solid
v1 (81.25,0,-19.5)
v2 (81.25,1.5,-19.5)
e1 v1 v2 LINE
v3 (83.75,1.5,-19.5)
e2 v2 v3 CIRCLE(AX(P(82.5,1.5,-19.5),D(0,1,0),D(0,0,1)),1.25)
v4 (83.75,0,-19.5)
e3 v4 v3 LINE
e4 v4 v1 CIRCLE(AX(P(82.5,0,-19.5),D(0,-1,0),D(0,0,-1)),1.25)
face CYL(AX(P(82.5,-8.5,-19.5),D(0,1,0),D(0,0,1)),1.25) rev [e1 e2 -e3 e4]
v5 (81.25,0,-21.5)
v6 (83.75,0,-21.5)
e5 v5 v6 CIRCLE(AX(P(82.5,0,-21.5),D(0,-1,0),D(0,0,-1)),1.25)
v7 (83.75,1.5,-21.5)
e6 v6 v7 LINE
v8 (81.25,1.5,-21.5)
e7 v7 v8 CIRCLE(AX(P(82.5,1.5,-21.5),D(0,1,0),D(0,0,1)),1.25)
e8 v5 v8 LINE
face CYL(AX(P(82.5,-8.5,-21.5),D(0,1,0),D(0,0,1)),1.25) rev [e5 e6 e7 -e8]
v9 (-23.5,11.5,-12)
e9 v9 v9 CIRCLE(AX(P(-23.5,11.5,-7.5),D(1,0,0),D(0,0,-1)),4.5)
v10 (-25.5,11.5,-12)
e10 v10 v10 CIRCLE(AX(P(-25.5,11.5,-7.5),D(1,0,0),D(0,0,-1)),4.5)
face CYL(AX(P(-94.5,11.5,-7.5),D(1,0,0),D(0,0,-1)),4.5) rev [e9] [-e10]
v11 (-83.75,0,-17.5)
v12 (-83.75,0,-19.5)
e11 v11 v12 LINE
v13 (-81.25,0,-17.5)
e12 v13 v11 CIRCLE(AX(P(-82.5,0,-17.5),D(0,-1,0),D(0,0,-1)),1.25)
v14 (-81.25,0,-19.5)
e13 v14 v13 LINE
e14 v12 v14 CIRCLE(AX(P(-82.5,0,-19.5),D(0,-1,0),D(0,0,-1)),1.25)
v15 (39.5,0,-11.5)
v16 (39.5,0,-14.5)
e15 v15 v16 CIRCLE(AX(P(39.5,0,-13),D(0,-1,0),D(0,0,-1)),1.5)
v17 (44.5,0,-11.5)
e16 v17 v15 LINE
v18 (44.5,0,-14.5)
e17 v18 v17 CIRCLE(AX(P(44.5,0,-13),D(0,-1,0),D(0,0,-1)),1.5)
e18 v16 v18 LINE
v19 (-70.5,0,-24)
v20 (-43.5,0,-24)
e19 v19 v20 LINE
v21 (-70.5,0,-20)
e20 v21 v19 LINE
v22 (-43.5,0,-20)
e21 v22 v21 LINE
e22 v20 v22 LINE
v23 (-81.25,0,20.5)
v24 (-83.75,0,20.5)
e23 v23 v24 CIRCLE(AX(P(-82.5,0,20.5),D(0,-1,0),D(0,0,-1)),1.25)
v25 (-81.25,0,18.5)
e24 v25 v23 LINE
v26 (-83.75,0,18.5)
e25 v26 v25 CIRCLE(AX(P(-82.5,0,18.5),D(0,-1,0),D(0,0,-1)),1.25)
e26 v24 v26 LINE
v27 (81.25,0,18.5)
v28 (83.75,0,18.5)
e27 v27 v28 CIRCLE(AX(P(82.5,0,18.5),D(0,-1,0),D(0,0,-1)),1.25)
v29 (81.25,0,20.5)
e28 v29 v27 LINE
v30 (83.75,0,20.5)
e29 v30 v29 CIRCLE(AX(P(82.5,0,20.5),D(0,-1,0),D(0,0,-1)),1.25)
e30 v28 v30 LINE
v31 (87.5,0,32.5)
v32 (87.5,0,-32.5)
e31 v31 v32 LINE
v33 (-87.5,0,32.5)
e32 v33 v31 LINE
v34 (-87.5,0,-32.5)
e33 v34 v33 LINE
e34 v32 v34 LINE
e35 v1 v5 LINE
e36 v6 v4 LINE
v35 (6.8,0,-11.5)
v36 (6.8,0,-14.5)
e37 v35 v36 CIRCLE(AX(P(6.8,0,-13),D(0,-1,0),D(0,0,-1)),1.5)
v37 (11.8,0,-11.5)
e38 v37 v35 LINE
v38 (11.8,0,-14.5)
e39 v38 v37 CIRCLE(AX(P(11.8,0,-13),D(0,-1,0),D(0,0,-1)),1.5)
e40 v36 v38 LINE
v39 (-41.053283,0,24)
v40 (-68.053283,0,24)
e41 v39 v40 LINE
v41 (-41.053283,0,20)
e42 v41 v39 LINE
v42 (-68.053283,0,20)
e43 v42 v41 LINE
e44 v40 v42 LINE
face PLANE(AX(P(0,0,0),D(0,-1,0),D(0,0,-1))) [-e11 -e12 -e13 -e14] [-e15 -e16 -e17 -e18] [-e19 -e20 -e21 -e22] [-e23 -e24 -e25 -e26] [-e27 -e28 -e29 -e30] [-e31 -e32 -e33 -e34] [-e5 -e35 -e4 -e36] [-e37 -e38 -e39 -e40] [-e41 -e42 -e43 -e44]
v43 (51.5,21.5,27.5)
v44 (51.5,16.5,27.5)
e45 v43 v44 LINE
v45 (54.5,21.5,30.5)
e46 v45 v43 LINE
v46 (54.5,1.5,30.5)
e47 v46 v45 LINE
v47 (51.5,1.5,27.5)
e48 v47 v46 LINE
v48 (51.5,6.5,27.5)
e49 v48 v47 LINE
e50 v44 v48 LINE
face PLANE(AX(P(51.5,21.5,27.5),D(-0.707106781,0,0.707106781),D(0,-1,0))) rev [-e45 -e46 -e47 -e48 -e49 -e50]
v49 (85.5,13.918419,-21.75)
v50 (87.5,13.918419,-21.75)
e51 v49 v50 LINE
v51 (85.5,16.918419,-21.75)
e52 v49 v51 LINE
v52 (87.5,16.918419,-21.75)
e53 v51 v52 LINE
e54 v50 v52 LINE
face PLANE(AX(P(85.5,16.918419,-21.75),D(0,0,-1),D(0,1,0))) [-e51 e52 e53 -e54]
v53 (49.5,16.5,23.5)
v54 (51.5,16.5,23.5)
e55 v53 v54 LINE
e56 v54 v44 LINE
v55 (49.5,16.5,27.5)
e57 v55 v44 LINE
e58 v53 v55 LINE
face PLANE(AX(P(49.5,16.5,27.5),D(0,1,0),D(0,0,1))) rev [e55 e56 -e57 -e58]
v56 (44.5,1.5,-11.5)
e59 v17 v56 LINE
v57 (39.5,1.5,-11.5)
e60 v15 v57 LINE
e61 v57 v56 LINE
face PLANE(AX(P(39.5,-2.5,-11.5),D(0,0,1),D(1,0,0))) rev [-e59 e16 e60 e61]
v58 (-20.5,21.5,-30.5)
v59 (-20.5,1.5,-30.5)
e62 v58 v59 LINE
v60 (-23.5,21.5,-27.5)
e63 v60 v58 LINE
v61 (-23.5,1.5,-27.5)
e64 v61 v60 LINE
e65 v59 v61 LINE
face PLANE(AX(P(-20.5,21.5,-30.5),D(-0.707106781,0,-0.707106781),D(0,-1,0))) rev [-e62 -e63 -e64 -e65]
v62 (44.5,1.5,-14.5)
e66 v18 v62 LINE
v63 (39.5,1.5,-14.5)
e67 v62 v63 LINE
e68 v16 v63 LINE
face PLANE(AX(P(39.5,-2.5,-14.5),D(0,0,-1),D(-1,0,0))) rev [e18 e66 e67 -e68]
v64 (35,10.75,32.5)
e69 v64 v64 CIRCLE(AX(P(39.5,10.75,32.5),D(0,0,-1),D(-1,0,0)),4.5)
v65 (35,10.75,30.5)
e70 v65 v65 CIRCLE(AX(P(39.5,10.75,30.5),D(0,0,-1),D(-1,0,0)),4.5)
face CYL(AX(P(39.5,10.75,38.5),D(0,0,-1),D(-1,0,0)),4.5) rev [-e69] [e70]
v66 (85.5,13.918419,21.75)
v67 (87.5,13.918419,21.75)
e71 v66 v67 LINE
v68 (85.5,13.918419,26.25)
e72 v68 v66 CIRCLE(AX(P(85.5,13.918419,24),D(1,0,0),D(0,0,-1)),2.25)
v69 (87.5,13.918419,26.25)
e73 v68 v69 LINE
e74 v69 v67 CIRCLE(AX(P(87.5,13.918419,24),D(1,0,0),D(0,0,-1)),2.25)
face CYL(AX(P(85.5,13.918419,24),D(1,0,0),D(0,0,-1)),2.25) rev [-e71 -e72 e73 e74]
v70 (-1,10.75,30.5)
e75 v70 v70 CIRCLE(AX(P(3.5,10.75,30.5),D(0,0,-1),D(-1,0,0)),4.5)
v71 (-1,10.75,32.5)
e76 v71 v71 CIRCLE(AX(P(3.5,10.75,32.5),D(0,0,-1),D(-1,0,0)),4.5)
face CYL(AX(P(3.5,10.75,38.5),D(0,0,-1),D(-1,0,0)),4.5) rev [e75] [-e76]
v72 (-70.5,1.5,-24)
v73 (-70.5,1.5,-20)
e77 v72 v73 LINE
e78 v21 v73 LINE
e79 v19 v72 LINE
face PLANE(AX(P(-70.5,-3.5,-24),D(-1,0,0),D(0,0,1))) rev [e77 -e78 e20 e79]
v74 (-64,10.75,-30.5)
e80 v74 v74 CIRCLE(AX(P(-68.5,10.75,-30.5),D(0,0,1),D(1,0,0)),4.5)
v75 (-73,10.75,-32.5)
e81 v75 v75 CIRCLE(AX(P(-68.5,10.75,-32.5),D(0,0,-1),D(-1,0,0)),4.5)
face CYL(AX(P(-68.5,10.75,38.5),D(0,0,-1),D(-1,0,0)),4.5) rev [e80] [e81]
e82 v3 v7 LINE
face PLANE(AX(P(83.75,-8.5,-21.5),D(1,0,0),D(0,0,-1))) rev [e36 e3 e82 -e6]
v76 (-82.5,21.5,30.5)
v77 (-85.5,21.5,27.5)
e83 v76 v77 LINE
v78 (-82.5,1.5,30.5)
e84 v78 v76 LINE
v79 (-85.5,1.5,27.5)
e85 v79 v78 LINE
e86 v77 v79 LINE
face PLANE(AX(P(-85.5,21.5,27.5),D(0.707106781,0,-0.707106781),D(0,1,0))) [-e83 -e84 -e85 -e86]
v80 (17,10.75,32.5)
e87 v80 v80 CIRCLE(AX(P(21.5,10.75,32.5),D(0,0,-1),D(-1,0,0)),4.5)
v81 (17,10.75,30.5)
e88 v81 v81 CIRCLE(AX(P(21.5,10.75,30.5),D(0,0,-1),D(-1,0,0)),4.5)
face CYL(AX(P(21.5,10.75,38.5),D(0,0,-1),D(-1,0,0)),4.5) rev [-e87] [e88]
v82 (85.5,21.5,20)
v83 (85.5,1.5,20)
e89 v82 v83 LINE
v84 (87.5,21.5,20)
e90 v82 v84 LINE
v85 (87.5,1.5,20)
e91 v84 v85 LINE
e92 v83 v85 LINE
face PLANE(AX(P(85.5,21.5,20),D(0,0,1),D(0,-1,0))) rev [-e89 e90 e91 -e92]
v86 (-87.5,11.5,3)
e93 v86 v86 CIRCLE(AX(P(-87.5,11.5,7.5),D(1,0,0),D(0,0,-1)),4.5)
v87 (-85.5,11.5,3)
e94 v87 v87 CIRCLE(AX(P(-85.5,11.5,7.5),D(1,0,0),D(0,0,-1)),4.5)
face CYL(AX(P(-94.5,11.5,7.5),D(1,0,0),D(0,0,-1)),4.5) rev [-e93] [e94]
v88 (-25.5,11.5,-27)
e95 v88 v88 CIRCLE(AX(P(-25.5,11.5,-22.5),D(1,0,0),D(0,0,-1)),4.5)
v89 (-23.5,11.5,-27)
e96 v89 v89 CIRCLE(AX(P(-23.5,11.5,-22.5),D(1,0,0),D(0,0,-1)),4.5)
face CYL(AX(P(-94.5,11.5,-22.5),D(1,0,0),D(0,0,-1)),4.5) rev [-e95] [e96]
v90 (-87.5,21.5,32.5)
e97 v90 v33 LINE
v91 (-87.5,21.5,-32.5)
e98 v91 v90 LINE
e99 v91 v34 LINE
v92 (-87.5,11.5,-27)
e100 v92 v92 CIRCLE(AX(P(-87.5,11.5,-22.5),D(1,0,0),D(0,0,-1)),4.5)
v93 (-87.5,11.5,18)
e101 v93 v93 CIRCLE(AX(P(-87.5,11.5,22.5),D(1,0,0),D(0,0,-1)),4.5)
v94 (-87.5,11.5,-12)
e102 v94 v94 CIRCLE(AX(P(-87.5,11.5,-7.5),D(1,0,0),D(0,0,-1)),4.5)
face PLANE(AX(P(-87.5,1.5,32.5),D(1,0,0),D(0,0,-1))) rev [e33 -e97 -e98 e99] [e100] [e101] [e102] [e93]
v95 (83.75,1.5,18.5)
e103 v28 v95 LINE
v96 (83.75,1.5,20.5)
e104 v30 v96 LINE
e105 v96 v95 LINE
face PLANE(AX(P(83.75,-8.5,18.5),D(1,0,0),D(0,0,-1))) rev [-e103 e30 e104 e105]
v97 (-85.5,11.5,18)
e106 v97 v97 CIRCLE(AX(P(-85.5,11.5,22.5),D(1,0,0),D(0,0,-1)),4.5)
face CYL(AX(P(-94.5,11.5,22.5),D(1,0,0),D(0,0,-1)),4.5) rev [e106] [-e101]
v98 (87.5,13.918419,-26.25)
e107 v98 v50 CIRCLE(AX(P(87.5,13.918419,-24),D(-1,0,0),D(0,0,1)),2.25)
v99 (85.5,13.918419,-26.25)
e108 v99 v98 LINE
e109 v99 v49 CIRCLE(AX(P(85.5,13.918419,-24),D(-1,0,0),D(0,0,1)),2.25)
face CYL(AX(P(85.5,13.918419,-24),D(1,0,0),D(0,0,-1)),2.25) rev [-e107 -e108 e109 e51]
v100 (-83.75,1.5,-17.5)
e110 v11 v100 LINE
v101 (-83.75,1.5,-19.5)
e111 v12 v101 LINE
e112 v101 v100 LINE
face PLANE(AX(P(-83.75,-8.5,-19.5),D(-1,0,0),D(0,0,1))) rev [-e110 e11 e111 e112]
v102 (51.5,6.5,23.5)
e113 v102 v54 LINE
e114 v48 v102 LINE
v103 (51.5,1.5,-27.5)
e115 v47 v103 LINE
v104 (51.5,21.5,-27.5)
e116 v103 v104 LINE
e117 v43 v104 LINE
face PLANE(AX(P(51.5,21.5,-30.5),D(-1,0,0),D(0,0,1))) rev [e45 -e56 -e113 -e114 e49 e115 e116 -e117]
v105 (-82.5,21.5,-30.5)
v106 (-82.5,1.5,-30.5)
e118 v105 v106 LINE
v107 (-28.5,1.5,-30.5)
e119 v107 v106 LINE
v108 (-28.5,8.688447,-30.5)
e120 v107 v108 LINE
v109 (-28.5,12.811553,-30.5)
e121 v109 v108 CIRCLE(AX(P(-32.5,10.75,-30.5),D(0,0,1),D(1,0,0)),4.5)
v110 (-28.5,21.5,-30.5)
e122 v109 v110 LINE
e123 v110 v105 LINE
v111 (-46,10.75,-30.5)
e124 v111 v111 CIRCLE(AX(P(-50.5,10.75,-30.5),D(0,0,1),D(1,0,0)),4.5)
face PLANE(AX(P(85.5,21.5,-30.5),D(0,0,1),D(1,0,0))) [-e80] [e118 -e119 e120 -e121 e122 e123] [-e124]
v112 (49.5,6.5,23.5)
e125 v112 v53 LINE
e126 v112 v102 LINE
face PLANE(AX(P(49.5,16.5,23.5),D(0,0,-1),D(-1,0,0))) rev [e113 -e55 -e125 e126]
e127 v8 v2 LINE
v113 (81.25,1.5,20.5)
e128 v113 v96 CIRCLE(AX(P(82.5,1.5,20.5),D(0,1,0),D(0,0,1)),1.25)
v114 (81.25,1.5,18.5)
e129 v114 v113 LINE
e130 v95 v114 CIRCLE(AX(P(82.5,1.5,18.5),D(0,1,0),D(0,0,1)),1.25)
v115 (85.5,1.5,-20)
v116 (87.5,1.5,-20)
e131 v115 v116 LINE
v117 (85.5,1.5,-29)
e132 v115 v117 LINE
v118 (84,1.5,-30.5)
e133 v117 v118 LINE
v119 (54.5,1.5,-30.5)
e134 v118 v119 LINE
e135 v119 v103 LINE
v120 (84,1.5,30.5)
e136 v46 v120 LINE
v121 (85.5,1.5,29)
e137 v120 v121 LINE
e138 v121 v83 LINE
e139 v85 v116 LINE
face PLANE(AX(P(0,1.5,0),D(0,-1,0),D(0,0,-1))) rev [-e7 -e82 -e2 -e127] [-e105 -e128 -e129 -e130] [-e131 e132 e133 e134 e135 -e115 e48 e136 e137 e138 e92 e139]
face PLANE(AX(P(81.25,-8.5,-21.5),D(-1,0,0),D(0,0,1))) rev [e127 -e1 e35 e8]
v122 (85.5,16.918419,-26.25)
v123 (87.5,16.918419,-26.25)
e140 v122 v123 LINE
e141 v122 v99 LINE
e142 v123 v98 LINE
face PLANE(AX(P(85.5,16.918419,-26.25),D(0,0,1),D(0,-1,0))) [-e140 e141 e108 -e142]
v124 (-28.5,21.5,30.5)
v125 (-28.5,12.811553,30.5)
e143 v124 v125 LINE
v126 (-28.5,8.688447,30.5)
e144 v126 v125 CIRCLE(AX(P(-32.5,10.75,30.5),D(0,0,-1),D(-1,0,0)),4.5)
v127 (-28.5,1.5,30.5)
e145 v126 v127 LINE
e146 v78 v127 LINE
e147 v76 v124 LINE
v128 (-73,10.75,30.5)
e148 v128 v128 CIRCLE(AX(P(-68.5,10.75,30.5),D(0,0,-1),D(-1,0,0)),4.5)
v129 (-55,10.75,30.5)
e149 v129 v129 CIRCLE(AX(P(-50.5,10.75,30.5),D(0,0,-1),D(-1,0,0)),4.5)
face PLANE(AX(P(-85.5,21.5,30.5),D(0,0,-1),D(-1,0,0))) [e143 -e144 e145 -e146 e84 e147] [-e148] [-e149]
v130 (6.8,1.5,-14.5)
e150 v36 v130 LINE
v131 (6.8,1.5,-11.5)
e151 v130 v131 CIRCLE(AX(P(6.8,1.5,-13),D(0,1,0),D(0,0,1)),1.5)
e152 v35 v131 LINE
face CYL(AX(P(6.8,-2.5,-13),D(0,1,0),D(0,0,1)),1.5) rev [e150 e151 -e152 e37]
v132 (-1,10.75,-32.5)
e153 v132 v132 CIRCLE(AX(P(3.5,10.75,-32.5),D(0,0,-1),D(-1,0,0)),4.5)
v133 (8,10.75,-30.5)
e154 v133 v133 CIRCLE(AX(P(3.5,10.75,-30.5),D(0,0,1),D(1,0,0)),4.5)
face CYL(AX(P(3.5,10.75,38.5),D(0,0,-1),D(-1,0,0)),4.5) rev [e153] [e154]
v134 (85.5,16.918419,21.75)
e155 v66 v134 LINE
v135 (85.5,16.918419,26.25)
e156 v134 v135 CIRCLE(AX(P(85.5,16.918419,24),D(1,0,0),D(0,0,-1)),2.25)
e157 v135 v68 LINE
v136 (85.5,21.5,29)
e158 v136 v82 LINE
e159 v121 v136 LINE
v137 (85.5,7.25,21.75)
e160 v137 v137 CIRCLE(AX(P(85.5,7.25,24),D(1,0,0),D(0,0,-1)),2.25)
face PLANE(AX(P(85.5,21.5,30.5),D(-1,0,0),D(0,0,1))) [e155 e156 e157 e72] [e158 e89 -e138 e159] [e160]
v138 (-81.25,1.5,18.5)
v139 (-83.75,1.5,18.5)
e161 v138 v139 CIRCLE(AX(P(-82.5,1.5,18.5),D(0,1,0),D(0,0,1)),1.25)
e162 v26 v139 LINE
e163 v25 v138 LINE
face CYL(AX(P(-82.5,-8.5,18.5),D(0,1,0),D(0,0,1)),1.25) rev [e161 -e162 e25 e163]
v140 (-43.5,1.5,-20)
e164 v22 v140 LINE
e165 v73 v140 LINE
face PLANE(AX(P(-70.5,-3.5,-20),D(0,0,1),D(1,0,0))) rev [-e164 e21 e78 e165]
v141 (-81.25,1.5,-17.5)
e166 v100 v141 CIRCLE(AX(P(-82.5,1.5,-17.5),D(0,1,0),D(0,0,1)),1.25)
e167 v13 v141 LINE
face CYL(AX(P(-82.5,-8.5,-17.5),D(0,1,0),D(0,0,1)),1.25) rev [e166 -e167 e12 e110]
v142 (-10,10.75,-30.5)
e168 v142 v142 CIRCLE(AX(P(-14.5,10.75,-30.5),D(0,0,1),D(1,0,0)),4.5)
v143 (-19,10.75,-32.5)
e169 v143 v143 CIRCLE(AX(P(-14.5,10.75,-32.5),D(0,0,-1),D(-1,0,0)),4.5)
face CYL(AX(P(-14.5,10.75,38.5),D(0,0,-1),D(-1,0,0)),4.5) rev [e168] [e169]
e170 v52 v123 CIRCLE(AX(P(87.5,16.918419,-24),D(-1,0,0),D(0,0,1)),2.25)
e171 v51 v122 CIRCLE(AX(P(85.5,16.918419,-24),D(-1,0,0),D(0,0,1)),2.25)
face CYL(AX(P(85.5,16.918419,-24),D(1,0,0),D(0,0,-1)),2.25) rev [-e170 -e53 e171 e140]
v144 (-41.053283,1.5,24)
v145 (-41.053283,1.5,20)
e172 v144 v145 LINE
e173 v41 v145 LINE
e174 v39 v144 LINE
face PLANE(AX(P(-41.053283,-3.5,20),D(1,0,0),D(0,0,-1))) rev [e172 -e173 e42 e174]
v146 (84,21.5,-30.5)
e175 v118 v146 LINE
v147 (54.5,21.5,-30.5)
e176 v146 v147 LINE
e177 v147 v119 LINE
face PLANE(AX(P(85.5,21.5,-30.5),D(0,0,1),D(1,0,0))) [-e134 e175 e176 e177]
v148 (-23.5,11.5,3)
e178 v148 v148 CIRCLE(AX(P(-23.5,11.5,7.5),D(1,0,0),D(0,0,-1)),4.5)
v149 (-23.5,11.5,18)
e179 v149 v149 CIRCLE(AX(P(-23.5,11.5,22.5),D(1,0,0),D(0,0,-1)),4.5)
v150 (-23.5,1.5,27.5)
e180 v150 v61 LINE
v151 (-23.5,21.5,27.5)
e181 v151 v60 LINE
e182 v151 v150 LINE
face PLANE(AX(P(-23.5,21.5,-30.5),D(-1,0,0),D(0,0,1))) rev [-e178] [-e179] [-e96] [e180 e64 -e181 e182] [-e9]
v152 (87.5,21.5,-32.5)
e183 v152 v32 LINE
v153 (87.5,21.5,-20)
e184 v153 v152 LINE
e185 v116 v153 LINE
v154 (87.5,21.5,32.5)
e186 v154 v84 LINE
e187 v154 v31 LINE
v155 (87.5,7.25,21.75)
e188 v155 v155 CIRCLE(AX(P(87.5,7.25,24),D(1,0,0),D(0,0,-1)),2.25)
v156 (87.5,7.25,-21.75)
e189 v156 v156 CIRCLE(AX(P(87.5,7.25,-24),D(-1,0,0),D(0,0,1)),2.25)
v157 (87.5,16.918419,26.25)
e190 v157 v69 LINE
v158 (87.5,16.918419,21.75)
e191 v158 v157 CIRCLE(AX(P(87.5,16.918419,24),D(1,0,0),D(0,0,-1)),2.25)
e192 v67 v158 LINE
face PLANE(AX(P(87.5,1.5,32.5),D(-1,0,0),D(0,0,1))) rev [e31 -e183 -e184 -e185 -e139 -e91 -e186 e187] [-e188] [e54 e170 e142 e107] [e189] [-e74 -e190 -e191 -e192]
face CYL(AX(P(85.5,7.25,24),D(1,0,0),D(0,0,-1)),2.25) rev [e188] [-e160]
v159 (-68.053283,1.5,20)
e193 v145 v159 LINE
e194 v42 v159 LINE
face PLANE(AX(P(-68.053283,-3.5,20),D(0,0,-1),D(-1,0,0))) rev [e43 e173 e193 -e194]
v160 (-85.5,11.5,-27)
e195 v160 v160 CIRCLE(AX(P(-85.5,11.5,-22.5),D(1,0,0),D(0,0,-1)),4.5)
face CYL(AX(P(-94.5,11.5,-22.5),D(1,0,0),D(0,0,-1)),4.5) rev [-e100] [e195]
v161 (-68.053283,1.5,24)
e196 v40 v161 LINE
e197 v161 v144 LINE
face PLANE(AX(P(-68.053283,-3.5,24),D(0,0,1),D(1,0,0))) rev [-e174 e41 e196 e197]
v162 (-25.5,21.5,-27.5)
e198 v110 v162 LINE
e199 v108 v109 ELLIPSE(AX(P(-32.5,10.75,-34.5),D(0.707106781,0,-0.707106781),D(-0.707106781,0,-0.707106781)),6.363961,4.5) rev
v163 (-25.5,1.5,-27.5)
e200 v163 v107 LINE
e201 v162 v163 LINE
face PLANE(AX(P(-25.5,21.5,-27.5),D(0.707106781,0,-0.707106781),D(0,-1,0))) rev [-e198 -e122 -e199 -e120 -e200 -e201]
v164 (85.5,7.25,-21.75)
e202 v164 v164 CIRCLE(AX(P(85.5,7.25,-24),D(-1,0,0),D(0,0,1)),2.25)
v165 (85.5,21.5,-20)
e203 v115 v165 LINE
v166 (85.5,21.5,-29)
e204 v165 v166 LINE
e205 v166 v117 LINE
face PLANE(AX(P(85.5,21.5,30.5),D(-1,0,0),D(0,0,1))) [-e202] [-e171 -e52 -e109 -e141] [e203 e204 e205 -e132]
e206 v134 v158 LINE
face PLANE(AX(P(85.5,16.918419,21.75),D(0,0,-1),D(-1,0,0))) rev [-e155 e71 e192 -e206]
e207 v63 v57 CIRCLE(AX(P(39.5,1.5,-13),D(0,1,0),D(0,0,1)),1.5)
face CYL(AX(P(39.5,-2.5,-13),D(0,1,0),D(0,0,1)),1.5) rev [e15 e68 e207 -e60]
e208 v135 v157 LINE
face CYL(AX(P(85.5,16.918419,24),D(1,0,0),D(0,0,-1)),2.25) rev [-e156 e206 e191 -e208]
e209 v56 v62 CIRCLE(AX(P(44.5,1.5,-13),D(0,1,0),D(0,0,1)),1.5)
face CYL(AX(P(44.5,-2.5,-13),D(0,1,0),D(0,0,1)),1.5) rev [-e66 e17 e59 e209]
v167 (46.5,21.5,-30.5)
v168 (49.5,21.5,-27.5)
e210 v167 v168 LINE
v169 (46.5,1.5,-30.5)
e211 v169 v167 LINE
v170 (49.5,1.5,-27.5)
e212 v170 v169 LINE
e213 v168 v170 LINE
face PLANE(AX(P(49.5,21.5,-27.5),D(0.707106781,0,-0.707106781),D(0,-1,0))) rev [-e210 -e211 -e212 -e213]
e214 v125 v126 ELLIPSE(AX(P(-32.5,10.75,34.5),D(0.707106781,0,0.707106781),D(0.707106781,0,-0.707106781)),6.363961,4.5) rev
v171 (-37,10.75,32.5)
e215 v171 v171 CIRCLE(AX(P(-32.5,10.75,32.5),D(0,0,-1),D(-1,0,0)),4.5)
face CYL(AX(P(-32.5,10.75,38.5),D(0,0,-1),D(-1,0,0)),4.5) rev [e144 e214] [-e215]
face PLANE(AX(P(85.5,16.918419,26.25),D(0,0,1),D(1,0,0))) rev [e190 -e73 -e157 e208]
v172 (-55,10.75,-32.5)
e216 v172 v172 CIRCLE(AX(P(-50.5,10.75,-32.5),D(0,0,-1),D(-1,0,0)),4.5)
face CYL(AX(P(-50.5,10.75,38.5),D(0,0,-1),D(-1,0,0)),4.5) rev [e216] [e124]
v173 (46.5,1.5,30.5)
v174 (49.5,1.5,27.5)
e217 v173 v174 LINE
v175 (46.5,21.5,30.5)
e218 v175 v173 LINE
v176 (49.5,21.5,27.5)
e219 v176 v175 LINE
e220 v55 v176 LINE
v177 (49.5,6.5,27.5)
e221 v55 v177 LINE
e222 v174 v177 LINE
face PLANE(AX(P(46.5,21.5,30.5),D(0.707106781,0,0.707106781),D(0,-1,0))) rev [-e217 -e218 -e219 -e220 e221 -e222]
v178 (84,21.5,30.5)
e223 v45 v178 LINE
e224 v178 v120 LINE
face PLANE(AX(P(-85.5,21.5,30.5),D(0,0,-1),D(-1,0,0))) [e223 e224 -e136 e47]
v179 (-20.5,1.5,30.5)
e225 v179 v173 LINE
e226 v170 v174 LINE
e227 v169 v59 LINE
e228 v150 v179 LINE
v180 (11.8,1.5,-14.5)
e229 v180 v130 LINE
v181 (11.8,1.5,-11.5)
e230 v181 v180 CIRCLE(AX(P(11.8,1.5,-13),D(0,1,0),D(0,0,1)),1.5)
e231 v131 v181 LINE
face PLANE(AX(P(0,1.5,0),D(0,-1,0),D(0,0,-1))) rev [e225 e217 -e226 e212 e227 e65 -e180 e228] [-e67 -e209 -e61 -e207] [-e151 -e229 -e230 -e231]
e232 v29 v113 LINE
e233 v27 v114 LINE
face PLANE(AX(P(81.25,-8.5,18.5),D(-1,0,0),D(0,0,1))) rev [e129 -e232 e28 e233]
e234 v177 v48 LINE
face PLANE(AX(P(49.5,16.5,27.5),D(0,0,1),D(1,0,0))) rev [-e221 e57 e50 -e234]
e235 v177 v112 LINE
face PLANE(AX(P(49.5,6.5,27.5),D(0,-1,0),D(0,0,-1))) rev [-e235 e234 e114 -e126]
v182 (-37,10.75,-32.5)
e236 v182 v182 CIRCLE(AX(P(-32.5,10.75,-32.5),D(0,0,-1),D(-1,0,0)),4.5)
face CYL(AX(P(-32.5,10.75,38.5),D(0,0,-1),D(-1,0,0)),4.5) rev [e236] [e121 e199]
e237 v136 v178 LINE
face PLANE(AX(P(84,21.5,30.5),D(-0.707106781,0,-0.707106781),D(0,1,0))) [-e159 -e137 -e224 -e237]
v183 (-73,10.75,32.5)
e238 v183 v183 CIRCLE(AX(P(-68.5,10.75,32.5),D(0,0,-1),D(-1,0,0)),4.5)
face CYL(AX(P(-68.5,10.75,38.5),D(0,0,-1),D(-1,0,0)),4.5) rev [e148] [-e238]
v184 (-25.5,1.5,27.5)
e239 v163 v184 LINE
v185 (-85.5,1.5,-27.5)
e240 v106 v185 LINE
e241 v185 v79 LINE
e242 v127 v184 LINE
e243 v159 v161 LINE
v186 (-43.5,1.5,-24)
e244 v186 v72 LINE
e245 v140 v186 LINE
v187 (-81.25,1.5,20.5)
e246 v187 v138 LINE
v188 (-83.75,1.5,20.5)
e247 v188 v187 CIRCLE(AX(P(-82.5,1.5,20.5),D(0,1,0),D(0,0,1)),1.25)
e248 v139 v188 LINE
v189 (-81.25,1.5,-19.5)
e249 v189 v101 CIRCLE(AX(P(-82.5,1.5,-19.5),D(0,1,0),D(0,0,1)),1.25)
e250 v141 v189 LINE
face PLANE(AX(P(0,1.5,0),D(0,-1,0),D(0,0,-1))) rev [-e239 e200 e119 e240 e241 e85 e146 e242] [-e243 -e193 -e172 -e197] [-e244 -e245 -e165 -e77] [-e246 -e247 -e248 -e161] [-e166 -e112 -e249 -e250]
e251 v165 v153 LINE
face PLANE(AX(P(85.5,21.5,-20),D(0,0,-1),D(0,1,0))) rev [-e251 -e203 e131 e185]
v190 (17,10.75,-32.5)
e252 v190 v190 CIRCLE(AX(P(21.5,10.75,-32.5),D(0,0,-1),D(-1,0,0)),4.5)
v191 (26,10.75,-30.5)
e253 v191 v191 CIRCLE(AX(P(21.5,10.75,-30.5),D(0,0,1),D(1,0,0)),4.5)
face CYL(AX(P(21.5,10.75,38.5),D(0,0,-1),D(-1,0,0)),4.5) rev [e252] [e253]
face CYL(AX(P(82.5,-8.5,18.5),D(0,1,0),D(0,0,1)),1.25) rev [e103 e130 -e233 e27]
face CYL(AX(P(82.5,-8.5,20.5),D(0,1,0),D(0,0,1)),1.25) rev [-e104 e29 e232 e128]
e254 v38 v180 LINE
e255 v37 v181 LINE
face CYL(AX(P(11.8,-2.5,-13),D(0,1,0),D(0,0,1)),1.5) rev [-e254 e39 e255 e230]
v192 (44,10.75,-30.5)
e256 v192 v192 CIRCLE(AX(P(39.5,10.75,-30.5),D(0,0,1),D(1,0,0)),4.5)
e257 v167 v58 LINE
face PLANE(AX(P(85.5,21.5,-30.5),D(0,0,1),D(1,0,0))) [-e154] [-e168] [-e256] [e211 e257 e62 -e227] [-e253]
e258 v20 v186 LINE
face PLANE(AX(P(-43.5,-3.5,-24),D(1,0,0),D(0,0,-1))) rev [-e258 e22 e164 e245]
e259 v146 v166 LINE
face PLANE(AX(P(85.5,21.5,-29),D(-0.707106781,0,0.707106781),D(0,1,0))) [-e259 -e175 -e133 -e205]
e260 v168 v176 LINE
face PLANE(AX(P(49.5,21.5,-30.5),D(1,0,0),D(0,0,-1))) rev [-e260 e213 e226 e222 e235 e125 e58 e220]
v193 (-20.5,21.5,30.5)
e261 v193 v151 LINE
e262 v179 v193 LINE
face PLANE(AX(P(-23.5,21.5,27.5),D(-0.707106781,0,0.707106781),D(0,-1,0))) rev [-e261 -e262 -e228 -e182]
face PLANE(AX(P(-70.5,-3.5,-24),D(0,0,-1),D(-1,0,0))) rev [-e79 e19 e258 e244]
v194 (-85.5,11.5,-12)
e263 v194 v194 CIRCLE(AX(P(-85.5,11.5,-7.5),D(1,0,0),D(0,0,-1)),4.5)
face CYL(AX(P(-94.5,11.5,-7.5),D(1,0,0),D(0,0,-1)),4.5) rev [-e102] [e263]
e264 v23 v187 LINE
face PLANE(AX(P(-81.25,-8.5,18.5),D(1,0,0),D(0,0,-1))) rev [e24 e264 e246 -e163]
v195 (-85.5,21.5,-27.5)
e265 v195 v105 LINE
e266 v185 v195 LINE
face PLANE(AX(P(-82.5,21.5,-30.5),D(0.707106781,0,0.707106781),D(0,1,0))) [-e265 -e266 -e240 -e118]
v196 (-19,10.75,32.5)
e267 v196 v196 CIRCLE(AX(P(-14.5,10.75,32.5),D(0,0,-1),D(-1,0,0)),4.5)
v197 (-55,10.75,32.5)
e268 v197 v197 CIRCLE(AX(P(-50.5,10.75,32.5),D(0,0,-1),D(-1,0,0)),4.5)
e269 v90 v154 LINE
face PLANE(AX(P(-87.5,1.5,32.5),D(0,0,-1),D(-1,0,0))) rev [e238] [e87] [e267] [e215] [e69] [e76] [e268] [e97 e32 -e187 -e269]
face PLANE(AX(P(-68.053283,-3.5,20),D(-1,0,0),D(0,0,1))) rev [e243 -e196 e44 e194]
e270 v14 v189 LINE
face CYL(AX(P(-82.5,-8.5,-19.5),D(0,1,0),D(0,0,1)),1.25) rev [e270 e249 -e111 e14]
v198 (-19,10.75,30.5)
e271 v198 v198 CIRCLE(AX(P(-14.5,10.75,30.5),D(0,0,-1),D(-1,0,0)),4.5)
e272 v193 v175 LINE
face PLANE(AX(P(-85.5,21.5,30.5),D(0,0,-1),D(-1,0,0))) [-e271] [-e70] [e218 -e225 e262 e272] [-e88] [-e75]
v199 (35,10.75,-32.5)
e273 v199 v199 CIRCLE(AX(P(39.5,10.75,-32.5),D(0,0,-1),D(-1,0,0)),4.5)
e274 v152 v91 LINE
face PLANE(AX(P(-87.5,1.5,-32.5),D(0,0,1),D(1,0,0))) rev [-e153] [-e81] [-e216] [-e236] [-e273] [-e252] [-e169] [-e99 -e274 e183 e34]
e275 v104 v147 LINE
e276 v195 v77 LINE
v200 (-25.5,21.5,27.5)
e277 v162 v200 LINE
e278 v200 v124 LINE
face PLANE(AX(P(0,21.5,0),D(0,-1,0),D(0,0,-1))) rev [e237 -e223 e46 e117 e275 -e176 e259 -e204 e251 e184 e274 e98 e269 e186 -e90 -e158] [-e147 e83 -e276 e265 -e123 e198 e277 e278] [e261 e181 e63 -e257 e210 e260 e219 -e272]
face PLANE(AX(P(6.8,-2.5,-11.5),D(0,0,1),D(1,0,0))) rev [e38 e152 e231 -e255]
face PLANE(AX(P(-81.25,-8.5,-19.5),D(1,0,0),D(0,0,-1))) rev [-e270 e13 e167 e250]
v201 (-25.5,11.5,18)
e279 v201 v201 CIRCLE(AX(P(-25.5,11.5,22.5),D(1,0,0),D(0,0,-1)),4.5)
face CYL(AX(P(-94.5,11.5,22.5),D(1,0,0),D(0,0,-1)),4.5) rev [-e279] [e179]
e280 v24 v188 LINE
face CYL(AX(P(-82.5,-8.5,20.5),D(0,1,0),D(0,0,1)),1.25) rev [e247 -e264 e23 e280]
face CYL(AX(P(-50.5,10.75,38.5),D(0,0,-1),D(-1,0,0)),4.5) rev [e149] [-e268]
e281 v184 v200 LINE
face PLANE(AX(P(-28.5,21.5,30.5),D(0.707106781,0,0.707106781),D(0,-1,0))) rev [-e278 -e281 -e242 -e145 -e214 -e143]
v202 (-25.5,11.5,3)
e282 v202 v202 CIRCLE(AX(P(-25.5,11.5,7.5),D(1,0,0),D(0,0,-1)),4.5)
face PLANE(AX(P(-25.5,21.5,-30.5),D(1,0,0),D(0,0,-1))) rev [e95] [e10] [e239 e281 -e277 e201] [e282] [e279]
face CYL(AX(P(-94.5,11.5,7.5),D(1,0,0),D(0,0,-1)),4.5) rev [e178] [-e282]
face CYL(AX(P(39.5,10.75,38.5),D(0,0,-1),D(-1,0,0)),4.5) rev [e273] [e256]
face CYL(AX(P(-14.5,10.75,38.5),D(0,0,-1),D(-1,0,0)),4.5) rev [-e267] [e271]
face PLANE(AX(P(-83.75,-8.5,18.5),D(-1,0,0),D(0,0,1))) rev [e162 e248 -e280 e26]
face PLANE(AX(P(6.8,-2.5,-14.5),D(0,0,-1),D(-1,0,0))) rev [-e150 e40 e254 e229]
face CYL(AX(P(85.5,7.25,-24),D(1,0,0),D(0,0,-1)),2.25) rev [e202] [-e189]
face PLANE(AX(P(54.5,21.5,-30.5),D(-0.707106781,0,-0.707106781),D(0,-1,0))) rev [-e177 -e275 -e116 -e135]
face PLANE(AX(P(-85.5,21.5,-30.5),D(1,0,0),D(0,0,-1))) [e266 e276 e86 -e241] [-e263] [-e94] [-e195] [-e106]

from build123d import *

# Parameters (mm, degrees)
SKETCH_1_W             = 175
SKETCH_1_H             = 65
EXTRUDE_1_DEPTH        = 1.5
SKETCH_3_W             = 175
SKETCH_3_H             = 65
SKETCH_3_W_2           = 171
SKETCH_3_H_2           = 61
EXTRUDE_2_DEPTH        = 20
SKETCH_4_W             = 40
SKETCH_4_H             = 20
CUT_EXTRUDE_1_DEPTH    = 2
SKETCH_6_R             = 2.25
CUT_EXTRUDE_2_DEPTH    = 2
SKETCH_9_W             = 2
SKETCH_9_H             = 61
EXTRUDE_4_DEPTH        = 20
SKETCH_12_W            = 4
SKETCH_12_H            = 10
CUT_EXTRUDE_4_DEPTH    = 2
CHAMFER_1_SIZE         = 3
CHAMFER_2_SIZE         = 3
CHAMFER_3_SIZE         = 1.5
SKETCH_13_R            = 4.5
CUT_EXTRUDE_5_DEPTH    = 71
PATTERN_LINEAR_1_COUNT = 7
PATTERN_LINEAR_1_PITCH = 18
SKETCH_14_W            = 2
SKETCH_14_H            = 61
EXTRUDE_5_DEPTH        = 20
CHAMFER_4_SIZE         = 3
CHAMFER_5_SIZE         = 3
SKETCH_15_R            = 4.5
CUT_EXTRUDE_6_DEPTH    = 71
PATTERN_LINEAR_2_COUNT = 4
PATTERN_LINEAR_2_PITCH = 15
CUT_EXTRUDE_7_DEPTH    = 4
SKETCH_18_W            = 27
SKETCH_18_H            = 4
CUT_EXTRUDE_8_DEPTH    = 5
CUT_EXTRUDE_9_DEPTH    = 10


# Some blends are built 0.0001 mm under size
with BuildPart() as part:
    # Эскиз1 → Бобышка-Вытянуть1 (new body)
    with BuildSketch(Plane(origin=(0, 0, 0), x_dir=(1, 0, 0), z_dir=(0, 1, 0))):
        Rectangle(SKETCH_1_W, SKETCH_1_H)
    extrude(amount=EXTRUDE_1_DEPTH)

    # Эскиз3 → Бобышка-Вытянуть2 (add)
    with BuildSketch(Plane(origin=(0, 1.5, 0), x_dir=(1, 0, 0), z_dir=(0, 1, 0))):
        Rectangle(SKETCH_3_W, SKETCH_3_H)
        Rectangle(SKETCH_3_W_2, SKETCH_3_H_2, mode=Mode.SUBTRACT)
    extrude(amount=EXTRUDE_2_DEPTH)

    # Эскиз4 → Вырез-Вытянуть1 (cut)
    with BuildSketch(Plane(origin=(87.5, 0, 0), x_dir=(0, 0, -1), z_dir=(1, 0, 0))):
        with Locations((0, 11.5)):
            Rectangle(SKETCH_4_W, SKETCH_4_H)
    extrude(amount=-CUT_EXTRUDE_1_DEPTH, mode=Mode.SUBTRACT)

    # Эскиз6 → Вырез-Вытянуть2 (cut)
    with BuildSketch(Plane(origin=(87.5, 0, 0), x_dir=(0, 0, -1), z_dir=(1, 0, 0))):
        with Locations((-24, 7.25)):
            Circle(SKETCH_6_R)
        with BuildLine():
            Line((-21.75, 16.918419021), (-21.75, 13.918419021))
            ThreePointArc((-21.75, 13.918419021), (-24, 11.668419021), (-26.25, 13.918419021))
            Line((-26.25, 13.918419021), (-26.25, 16.918419021))
            ThreePointArc((-26.25, 16.918419021), (-24, 19.168419021), (-21.75, 16.918419021))
        make_face()
    cut_extrude_2 = extrude(amount=-CUT_EXTRUDE_2_DEPTH, mode=Mode.SUBTRACT)

    # Зеркальное отражение2: Вырез-Вытянуть2 across plane
    add(cut_extrude_2.mirror(Plane(origin=(0, 0, 0), x_dir=(1, 0, 0), z_dir=(0, 0, -1))), mode=Mode.SUBTRACT)

    # Эскиз9 → Бобышка-Вытянуть4 (add)
    with BuildSketch(Plane(origin=(0, 1.5, 0), x_dir=(1, 0, 0), z_dir=(0, 1, 0))):
        with Locations((50.5, 0)):
            Rectangle(SKETCH_9_W, SKETCH_9_H)
    extrude(amount=EXTRUDE_4_DEPTH)

    # Эскиз12 → Вырез-Вытянуть4 (cut)
    with BuildSketch(Plane(origin=(51.5, 0, 0), x_dir=(0, 0, -1), z_dir=(1, 0, 0))):
        with Locations((-25.5, 11.5)):
            Rectangle(SKETCH_12_W, SKETCH_12_H)
    extrude(amount=-CUT_EXTRUDE_4_DEPTH, mode=Mode.SUBTRACT)

    # Фаска1
    chamfer_1_edges = [part.edges().sort_by_distance(p)[0] for p in [
        (-85.5, 11.5, -30.5),
        (-85.5, 11.5, 30.5),
        (49.5, 11.5, -30.5),
        (49.5, 11.5, 30.5),
    ]]
    chamfer(chamfer_1_edges, length=CHAMFER_1_SIZE - 0.0001)  # a hair under: the kernel refuses the full size

    # Фаска2
    chamfer_2_edges = [part.edges().sort_by_distance(p)[0] for p in [
        (51.5, 11.5, 30.5),
        (51.5, 11.5, -30.5),
    ]]
    chamfer(chamfer_2_edges, length=CHAMFER_2_SIZE - 0.0001)  # a hair under: the kernel refuses the full size

    # Фаска3
    chamfer_3_edges = [part.edges().sort_by_distance(p)[0] for p in [
        (85.5, 11.5, 30.5),
        (85.5, 11.5, -30.5),
    ]]
    chamfer(chamfer_3_edges, length=CHAMFER_3_SIZE)

    # Эскиз13 → Вырез-Вытянуть5 (cut)
    with BuildSketch(Plane(origin=(0, 0, -32.5), x_dir=(-1, 0, 0), z_dir=(0, 0, -1))):
        with Locations((-39.5, 10.75)):
            Circle(SKETCH_13_R)
    cut_extrude_5 = extrude(amount=-CUT_EXTRUDE_5_DEPTH, mode=Mode.SUBTRACT)

    # Линейный массив1: Вырез-Вытянуть5 ×7
    with Locations(*[(-i * PATTERN_LINEAR_1_PITCH, 0, 0) for i in range(1, PATTERN_LINEAR_1_COUNT)]):
        add(cut_extrude_5, mode=Mode.SUBTRACT)

    # Эскиз14 → Бобышка-Вытянуть5 (add)
    with BuildSketch(Plane(origin=(0, 1.5, 0), x_dir=(1, 0, 0), z_dir=(0, 1, 0))):
        with Locations((-24.5, 0)):
            Rectangle(SKETCH_14_W, SKETCH_14_H)
    extrude(amount=EXTRUDE_5_DEPTH)

    # Фаска4
    # the kernel refuses this chamfer: 3 mm, written as the material it adds along each edge
    with BuildSketch(Plane(origin=(-25.5, 1.5, -30.5), x_dir=(-0.9996219169112968, 0, -0.027495876610586733), z_dir=(0, 1, 0))) as chamfer_4_piece_1_section:
        Polygon((CHAMFER_4_SIZE * 0.999621916911, CHAMFER_4_SIZE * 0.0274958766106), (-CHAMFER_4_SIZE * 0.0274958766106, CHAMFER_4_SIZE * 0.999621916911), (0, 0), align=None)
    chamfer_4_piece_1 = extrude(amount=20, mode=Mode.PRIVATE)
    chamfer_4_piece_1 = chamfer_4_piece_1 - Plane(origin=(-32.5, 10.75, -29.506003932), x_dir=(-1, 0, 0), z_dir=(0, 0, -1)) * Cylinder(4.5, 52, mode=Mode.PRIVATE)
    add(chamfer_4_piece_1)
    with BuildSketch(Plane(origin=(-25.5, 1.5, 30.5), x_dir=(-0.9996219169112968, 0, 0.0274958766105868), z_dir=(0, 1, 0))) as chamfer_4_piece_2_section:
        Polygon((CHAMFER_4_SIZE * 0.999621916911, -CHAMFER_4_SIZE * 0.0274958766106), (-CHAMFER_4_SIZE * 0.0274958766106, -CHAMFER_4_SIZE * 0.999621916911), (0, 0), align=None)
    chamfer_4_piece_2 = extrude(amount=20, mode=Mode.PRIVATE)
    chamfer_4_piece_2 = chamfer_4_piece_2 - Plane(origin=(-32.5, 10.75, 29.506003932), x_dir=(-1, 0, 0), z_dir=(0, 0, -1)) * Cylinder(4.5, 52, mode=Mode.PRIVATE)
    add(chamfer_4_piece_2)

    # Фаска5
    chamfer_5_edges = [part.edges().sort_by_distance(p)[0] for p in [
        (-23.5, 11.5, 30.5),
        (-23.5, 11.5, -30.5),
    ]]
    chamfer(chamfer_5_edges, length=CHAMFER_5_SIZE)

    # Эскиз15 → Вырез-Вытянуть6 (cut)
    with BuildSketch(Plane(origin=(-23.5, 0, 0), x_dir=(0, 0, -1), z_dir=(1, 0, 0))):
        with Locations((-22.5, 11.5)):
            Circle(SKETCH_15_R)
    cut_extrude_6 = extrude(amount=-CUT_EXTRUDE_6_DEPTH, mode=Mode.SUBTRACT)

    # Линейный массив2: Вырез-Вытянуть6 ×4
    with Locations(*[(0, 0, -i * PATTERN_LINEAR_2_PITCH) for i in range(1, PATTERN_LINEAR_2_COUNT)]):
        add(cut_extrude_6, mode=Mode.SUBTRACT)

    # Эскиз16 → Вырез-Вытянуть7 (cut)
    with BuildSketch(Plane(origin=(0, 1.5, 0), x_dir=(1, 0, 0), z_dir=(0, 1, 0))):
        with BuildLine():
            Line((6.8, 14.5), (11.8, 14.5))
            ThreePointArc((11.8, 14.5), (13.3, 13), (11.8, 11.5))
            Line((11.8, 11.5), (6.8, 11.5))
            ThreePointArc((6.8, 11.5), (5.3, 13), (6.8, 14.5))
        make_face()
        with BuildLine():
            Line((39.5, 14.5), (44.5, 14.5))
            ThreePointArc((44.5, 14.5), (46, 13), (44.5, 11.5))
            Line((44.5, 11.5), (39.5, 11.5))
            ThreePointArc((39.5, 11.5), (38, 13), (39.5, 14.5))
        make_face()
    extrude(amount=-CUT_EXTRUDE_7_DEPTH, mode=Mode.SUBTRACT)

    # Эскиз18 → Вырез-Вытянуть8 (cut)
    with BuildSketch(Plane(origin=(0, 1.5, 0), x_dir=(1, 0, 0), z_dir=(0, 1, 0))):
        with Locations((-57, 22)):
            Rectangle(SKETCH_18_W, SKETCH_18_H)
        with Locations((-54.553283303, -22)):
            Rectangle(SKETCH_18_W, SKETCH_18_H)
    extrude(amount=-CUT_EXTRUDE_8_DEPTH, mode=Mode.SUBTRACT)

    # Эскиз19 → Вырез-Вытянуть9 (cut)
    with BuildSketch(Plane(origin=(0, 1.5, 0), x_dir=(1, 0, 0), z_dir=(0, 1, 0))):
        with BuildLine():
            Line((83.75, 21.5), (83.75, 19.5))
            ThreePointArc((83.75, 19.5), (82.5, 18.25), (81.25, 19.5))
            Line((81.25, 19.5), (81.25, 21.5))
            ThreePointArc((81.25, 21.5), (82.5, 22.75), (83.75, 21.5))
        make_face()
        with BuildLine():
            Line((83.75, -18.5), (83.75, -20.5))
            ThreePointArc((83.75, -20.5), (82.5, -21.75), (81.25, -20.5))
            Line((81.25, -20.5), (81.25, -18.5))
            ThreePointArc((81.25, -18.5), (82.5, -17.25), (83.75, -18.5))
        make_face()
        with BuildLine():
            Line((-81.25, 19.5), (-81.25, 17.5))
            ThreePointArc((-81.25, 17.5), (-82.5, 16.25), (-83.75, 17.5))
            Line((-83.75, 17.5), (-83.75, 19.5))
            ThreePointArc((-83.75, 19.5), (-82.5, 20.75), (-81.25, 19.5))
        make_face()
        with BuildLine():
            Line((-81.25, -18.5), (-81.25, -20.5))
            ThreePointArc((-81.25, -20.5), (-82.5, -21.75), (-83.75, -20.5))
            Line((-83.75, -20.5), (-83.75, -18.5))
            ThreePointArc((-83.75, -18.5), (-82.5, -17.25), (-81.25, -18.5))
        make_face()
    extrude(amount=-CUT_EXTRUDE_9_DEPTH, mode=Mode.SUBTRACT)


solid = part.part
